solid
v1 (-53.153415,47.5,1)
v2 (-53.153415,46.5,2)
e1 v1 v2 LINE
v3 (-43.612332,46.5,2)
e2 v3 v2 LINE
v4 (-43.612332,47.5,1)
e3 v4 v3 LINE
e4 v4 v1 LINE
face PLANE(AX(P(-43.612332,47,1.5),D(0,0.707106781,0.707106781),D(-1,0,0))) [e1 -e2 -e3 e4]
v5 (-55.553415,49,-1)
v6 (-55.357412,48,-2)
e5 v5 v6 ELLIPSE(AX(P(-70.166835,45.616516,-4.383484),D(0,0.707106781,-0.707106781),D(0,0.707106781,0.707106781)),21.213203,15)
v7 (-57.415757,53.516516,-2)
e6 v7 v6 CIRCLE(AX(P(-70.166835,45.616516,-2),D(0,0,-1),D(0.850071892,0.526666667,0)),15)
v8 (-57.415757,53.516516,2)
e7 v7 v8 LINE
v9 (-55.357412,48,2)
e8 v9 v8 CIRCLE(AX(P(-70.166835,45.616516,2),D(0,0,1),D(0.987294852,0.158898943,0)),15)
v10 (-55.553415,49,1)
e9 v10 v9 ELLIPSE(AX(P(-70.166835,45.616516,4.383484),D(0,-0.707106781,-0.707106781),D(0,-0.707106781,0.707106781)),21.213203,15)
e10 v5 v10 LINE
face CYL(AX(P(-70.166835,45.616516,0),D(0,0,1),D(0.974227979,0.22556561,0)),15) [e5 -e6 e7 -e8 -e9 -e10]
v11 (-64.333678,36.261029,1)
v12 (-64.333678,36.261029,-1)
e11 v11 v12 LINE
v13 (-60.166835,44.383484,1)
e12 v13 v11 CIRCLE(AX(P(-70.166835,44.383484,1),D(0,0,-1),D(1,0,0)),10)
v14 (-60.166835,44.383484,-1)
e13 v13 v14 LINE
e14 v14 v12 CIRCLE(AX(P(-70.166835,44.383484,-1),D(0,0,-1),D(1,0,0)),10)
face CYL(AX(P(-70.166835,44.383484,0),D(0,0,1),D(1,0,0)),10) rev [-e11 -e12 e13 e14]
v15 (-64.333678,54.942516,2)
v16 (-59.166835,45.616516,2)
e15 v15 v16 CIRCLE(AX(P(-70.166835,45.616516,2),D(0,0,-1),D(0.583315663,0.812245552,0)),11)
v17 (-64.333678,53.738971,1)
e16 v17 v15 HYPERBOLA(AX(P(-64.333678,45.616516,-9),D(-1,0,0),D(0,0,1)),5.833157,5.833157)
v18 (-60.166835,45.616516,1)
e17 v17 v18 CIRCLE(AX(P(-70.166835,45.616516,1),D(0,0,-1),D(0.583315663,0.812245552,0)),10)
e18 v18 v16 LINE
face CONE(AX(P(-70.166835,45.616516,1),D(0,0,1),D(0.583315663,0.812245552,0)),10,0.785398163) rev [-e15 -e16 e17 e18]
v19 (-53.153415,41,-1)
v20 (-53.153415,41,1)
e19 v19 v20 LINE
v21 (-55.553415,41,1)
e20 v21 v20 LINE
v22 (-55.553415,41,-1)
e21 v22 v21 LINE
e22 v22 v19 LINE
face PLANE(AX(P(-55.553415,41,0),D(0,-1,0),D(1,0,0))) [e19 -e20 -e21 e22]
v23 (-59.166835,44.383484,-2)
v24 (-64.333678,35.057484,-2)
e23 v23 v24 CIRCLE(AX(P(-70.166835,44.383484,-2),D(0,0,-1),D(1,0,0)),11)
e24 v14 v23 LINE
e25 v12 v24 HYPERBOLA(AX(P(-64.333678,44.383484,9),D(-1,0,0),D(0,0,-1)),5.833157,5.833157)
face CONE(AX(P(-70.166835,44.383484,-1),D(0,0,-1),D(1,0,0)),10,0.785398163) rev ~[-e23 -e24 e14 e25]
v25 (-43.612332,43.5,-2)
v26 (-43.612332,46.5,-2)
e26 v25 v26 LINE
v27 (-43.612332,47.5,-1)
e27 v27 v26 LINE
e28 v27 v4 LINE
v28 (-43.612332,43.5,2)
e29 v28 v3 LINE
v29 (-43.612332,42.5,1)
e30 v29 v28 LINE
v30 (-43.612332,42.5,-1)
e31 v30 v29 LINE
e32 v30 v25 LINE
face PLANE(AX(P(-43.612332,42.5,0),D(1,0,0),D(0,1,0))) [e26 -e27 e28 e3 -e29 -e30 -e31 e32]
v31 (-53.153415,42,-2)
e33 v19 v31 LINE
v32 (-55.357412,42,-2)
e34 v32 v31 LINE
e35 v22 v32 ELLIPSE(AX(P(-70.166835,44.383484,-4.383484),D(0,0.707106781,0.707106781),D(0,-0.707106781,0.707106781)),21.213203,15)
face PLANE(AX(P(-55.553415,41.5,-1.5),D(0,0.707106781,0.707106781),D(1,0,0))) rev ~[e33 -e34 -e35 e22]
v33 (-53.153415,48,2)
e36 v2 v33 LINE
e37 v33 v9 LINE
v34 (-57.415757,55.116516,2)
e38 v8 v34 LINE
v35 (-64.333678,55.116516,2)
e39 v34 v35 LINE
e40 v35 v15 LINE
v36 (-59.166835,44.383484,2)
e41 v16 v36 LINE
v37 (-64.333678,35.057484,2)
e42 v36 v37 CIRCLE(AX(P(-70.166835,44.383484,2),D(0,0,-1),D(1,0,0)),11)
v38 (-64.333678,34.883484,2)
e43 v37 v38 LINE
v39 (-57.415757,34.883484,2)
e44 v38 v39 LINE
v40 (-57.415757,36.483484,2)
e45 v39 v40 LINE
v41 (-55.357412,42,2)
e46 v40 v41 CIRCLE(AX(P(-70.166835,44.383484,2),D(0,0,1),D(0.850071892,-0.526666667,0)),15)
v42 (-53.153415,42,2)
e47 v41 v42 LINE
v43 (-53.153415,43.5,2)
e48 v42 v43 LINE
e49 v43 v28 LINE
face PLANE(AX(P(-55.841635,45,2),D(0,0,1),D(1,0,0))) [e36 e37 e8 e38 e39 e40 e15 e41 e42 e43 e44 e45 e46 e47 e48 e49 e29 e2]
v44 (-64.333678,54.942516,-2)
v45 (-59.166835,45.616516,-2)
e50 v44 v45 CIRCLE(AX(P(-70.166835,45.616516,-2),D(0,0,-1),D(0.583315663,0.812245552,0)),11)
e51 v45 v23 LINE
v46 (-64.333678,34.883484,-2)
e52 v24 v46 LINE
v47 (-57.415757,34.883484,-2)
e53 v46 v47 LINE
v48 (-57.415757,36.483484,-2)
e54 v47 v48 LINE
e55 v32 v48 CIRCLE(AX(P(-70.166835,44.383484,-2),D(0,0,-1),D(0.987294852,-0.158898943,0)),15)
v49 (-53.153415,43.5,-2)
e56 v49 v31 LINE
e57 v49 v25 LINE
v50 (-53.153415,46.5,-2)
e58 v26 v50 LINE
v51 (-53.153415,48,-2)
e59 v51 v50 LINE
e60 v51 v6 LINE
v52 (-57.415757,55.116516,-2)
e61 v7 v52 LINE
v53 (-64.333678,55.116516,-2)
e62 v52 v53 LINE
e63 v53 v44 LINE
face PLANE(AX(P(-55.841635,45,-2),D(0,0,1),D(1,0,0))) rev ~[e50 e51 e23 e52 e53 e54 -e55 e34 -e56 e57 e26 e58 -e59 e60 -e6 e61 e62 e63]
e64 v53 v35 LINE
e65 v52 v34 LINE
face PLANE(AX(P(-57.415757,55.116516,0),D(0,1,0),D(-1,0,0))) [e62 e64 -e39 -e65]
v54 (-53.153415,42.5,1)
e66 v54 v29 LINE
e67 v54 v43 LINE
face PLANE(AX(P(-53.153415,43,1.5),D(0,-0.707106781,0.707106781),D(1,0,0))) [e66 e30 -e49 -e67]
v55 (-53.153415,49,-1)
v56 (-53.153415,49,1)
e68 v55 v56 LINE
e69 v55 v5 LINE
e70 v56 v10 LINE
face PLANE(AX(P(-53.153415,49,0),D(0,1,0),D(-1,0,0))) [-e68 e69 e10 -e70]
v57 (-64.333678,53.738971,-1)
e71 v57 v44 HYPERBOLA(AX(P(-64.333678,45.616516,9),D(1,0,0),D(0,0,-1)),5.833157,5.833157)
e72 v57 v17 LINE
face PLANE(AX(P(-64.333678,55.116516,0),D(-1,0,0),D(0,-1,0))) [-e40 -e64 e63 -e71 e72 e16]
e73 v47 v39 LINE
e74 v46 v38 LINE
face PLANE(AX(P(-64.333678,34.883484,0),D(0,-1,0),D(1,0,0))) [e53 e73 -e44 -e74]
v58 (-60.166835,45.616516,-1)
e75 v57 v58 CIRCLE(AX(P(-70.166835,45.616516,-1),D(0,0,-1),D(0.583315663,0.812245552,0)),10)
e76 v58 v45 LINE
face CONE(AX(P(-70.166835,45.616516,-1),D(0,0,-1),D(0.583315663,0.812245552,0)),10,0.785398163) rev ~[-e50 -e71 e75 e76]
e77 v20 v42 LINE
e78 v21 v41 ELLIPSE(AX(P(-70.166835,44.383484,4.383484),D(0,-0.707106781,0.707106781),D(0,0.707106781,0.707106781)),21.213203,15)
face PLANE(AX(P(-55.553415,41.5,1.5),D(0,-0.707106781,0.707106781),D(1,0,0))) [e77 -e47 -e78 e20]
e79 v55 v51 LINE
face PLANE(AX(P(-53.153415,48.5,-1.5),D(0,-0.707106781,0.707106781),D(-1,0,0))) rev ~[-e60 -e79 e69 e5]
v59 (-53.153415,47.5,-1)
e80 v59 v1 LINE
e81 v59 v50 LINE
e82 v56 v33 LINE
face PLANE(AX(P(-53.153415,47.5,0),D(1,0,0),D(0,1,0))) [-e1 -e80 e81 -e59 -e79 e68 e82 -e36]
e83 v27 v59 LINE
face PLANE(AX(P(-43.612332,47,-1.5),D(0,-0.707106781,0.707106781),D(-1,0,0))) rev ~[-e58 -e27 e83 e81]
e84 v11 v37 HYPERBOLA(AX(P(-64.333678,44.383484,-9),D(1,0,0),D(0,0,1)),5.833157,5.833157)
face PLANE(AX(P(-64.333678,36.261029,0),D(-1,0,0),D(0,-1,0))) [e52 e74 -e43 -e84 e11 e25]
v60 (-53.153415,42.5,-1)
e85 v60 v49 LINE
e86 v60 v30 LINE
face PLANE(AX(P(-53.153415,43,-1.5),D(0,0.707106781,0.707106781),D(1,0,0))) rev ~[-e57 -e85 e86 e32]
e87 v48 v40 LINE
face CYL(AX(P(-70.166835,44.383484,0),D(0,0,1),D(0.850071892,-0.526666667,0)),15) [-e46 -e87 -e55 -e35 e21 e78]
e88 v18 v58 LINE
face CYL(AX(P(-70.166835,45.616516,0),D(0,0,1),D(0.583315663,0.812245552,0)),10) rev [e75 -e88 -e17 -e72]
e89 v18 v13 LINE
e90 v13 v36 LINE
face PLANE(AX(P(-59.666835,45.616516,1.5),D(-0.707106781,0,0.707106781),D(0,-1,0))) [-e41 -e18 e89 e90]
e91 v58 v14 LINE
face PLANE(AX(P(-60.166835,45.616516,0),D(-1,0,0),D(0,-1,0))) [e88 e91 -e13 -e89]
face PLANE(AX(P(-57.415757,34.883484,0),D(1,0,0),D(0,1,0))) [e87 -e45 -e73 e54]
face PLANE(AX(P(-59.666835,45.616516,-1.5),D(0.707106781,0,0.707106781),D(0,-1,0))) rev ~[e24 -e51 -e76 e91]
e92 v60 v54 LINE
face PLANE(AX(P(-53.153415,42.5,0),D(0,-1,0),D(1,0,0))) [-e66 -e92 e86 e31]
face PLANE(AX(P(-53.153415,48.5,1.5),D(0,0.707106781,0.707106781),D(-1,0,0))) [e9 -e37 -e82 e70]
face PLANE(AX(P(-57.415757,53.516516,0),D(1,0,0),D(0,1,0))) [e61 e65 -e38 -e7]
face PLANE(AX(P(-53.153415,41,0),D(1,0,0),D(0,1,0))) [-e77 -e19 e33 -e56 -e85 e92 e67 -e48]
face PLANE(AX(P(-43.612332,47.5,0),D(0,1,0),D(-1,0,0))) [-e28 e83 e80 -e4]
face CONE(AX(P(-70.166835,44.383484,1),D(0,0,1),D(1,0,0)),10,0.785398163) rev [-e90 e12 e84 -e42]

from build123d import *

# Parameters (mm, degrees)
F1_DEPTH = 2
F2_SIZE  = 1


with BuildPart() as f1:
    # F0 (on Top) → F1 (new body, symmetric)
    with BuildSketch(Plane.XY):
        with BuildLine():
            Line((-64.3336782856, 36.2610286334), (-64.3336782856, 34.8834841531))
            Line((-64.3336782856, 34.8834841531), (-57.4157565349, 34.8834841531))
            Line((-57.4157565349, 34.8834841531), (-57.4157565349, 36.4834841531))
            ThreePointArc((-57.4157565349, 36.4834841531), (-56.2994751301, 38.665413461), (-55.5534152324, 41))
            Line((-55.5534152324, 41), (-53.1534152324, 41))
            Line((-53.1534152324, 41), (-53.1534152324, 42.5))
            Line((-53.1534152324, 42.5), (-43.6123318144, 42.5))
            Line((-43.6123318144, 42.5), (-43.6123318144, 45))
            Line((-43.6123318144, 45), (-43.6123318144, 47.5))
            Line((-43.6123318144, 47.5), (-53.1534152324, 47.5))
            Line((-53.1534152324, 47.5), (-53.1534152324, 49))
            Line((-53.1534152324, 49), (-55.5534152324, 49))
            ThreePointArc((-55.5534152324, 49), (-56.2994751301, 51.334586539), (-57.4157565349, 53.5165158469))
            Line((-57.4157565349, 53.5165158469), (-57.4157565349, 55.1165158469))
            Line((-57.4157565349, 55.1165158469), (-64.3336782856, 55.1165158469))
            Line((-64.3336782856, 55.1165158469), (-64.3336782856, 53.7389713666))
            ThreePointArc((-64.3336782856, 53.7389713666), (-61.2693193587, 50.1809672734), (-60.1668349206, 45.6165158469))
            Line((-60.1668349206, 45.6165158469), (-60.1668349206, 44.3834841531))
            ThreePointArc((-60.1668349206, 44.3834841531), (-61.2693193587, 39.8190327266), (-64.3336782856, 36.2610286334))
        make_face()
    extrude(amount=F1_DEPTH, both=True)

    # F2
    f2_edges = [f1.edges().sort_by_distance(p)[0] for p in [
        (-54.353415, 49, -2),
        (-54.353415, 49, 2),
        (-54.353415, 41, 2),
        (-54.353415, 41, -2),
        (-48.382874, 47.5, -2),
        (-48.382874, 42.5, -2),
        (-48.382874, 47.5, 2),
        (-48.382874, 42.5, 2),
        (-61.269319, 50.180967, 2),
        (-61.269319, 39.819033, -2),
        (-61.269319, 39.819033, 2),
        (-60.166835, 45, -2),
        (-60.166835, 45, 2),
        (-61.269319, 50.180967, -2),
    ]]
    chamfer(f2_edges, length=F2_SIZE)


solid = f1.part
